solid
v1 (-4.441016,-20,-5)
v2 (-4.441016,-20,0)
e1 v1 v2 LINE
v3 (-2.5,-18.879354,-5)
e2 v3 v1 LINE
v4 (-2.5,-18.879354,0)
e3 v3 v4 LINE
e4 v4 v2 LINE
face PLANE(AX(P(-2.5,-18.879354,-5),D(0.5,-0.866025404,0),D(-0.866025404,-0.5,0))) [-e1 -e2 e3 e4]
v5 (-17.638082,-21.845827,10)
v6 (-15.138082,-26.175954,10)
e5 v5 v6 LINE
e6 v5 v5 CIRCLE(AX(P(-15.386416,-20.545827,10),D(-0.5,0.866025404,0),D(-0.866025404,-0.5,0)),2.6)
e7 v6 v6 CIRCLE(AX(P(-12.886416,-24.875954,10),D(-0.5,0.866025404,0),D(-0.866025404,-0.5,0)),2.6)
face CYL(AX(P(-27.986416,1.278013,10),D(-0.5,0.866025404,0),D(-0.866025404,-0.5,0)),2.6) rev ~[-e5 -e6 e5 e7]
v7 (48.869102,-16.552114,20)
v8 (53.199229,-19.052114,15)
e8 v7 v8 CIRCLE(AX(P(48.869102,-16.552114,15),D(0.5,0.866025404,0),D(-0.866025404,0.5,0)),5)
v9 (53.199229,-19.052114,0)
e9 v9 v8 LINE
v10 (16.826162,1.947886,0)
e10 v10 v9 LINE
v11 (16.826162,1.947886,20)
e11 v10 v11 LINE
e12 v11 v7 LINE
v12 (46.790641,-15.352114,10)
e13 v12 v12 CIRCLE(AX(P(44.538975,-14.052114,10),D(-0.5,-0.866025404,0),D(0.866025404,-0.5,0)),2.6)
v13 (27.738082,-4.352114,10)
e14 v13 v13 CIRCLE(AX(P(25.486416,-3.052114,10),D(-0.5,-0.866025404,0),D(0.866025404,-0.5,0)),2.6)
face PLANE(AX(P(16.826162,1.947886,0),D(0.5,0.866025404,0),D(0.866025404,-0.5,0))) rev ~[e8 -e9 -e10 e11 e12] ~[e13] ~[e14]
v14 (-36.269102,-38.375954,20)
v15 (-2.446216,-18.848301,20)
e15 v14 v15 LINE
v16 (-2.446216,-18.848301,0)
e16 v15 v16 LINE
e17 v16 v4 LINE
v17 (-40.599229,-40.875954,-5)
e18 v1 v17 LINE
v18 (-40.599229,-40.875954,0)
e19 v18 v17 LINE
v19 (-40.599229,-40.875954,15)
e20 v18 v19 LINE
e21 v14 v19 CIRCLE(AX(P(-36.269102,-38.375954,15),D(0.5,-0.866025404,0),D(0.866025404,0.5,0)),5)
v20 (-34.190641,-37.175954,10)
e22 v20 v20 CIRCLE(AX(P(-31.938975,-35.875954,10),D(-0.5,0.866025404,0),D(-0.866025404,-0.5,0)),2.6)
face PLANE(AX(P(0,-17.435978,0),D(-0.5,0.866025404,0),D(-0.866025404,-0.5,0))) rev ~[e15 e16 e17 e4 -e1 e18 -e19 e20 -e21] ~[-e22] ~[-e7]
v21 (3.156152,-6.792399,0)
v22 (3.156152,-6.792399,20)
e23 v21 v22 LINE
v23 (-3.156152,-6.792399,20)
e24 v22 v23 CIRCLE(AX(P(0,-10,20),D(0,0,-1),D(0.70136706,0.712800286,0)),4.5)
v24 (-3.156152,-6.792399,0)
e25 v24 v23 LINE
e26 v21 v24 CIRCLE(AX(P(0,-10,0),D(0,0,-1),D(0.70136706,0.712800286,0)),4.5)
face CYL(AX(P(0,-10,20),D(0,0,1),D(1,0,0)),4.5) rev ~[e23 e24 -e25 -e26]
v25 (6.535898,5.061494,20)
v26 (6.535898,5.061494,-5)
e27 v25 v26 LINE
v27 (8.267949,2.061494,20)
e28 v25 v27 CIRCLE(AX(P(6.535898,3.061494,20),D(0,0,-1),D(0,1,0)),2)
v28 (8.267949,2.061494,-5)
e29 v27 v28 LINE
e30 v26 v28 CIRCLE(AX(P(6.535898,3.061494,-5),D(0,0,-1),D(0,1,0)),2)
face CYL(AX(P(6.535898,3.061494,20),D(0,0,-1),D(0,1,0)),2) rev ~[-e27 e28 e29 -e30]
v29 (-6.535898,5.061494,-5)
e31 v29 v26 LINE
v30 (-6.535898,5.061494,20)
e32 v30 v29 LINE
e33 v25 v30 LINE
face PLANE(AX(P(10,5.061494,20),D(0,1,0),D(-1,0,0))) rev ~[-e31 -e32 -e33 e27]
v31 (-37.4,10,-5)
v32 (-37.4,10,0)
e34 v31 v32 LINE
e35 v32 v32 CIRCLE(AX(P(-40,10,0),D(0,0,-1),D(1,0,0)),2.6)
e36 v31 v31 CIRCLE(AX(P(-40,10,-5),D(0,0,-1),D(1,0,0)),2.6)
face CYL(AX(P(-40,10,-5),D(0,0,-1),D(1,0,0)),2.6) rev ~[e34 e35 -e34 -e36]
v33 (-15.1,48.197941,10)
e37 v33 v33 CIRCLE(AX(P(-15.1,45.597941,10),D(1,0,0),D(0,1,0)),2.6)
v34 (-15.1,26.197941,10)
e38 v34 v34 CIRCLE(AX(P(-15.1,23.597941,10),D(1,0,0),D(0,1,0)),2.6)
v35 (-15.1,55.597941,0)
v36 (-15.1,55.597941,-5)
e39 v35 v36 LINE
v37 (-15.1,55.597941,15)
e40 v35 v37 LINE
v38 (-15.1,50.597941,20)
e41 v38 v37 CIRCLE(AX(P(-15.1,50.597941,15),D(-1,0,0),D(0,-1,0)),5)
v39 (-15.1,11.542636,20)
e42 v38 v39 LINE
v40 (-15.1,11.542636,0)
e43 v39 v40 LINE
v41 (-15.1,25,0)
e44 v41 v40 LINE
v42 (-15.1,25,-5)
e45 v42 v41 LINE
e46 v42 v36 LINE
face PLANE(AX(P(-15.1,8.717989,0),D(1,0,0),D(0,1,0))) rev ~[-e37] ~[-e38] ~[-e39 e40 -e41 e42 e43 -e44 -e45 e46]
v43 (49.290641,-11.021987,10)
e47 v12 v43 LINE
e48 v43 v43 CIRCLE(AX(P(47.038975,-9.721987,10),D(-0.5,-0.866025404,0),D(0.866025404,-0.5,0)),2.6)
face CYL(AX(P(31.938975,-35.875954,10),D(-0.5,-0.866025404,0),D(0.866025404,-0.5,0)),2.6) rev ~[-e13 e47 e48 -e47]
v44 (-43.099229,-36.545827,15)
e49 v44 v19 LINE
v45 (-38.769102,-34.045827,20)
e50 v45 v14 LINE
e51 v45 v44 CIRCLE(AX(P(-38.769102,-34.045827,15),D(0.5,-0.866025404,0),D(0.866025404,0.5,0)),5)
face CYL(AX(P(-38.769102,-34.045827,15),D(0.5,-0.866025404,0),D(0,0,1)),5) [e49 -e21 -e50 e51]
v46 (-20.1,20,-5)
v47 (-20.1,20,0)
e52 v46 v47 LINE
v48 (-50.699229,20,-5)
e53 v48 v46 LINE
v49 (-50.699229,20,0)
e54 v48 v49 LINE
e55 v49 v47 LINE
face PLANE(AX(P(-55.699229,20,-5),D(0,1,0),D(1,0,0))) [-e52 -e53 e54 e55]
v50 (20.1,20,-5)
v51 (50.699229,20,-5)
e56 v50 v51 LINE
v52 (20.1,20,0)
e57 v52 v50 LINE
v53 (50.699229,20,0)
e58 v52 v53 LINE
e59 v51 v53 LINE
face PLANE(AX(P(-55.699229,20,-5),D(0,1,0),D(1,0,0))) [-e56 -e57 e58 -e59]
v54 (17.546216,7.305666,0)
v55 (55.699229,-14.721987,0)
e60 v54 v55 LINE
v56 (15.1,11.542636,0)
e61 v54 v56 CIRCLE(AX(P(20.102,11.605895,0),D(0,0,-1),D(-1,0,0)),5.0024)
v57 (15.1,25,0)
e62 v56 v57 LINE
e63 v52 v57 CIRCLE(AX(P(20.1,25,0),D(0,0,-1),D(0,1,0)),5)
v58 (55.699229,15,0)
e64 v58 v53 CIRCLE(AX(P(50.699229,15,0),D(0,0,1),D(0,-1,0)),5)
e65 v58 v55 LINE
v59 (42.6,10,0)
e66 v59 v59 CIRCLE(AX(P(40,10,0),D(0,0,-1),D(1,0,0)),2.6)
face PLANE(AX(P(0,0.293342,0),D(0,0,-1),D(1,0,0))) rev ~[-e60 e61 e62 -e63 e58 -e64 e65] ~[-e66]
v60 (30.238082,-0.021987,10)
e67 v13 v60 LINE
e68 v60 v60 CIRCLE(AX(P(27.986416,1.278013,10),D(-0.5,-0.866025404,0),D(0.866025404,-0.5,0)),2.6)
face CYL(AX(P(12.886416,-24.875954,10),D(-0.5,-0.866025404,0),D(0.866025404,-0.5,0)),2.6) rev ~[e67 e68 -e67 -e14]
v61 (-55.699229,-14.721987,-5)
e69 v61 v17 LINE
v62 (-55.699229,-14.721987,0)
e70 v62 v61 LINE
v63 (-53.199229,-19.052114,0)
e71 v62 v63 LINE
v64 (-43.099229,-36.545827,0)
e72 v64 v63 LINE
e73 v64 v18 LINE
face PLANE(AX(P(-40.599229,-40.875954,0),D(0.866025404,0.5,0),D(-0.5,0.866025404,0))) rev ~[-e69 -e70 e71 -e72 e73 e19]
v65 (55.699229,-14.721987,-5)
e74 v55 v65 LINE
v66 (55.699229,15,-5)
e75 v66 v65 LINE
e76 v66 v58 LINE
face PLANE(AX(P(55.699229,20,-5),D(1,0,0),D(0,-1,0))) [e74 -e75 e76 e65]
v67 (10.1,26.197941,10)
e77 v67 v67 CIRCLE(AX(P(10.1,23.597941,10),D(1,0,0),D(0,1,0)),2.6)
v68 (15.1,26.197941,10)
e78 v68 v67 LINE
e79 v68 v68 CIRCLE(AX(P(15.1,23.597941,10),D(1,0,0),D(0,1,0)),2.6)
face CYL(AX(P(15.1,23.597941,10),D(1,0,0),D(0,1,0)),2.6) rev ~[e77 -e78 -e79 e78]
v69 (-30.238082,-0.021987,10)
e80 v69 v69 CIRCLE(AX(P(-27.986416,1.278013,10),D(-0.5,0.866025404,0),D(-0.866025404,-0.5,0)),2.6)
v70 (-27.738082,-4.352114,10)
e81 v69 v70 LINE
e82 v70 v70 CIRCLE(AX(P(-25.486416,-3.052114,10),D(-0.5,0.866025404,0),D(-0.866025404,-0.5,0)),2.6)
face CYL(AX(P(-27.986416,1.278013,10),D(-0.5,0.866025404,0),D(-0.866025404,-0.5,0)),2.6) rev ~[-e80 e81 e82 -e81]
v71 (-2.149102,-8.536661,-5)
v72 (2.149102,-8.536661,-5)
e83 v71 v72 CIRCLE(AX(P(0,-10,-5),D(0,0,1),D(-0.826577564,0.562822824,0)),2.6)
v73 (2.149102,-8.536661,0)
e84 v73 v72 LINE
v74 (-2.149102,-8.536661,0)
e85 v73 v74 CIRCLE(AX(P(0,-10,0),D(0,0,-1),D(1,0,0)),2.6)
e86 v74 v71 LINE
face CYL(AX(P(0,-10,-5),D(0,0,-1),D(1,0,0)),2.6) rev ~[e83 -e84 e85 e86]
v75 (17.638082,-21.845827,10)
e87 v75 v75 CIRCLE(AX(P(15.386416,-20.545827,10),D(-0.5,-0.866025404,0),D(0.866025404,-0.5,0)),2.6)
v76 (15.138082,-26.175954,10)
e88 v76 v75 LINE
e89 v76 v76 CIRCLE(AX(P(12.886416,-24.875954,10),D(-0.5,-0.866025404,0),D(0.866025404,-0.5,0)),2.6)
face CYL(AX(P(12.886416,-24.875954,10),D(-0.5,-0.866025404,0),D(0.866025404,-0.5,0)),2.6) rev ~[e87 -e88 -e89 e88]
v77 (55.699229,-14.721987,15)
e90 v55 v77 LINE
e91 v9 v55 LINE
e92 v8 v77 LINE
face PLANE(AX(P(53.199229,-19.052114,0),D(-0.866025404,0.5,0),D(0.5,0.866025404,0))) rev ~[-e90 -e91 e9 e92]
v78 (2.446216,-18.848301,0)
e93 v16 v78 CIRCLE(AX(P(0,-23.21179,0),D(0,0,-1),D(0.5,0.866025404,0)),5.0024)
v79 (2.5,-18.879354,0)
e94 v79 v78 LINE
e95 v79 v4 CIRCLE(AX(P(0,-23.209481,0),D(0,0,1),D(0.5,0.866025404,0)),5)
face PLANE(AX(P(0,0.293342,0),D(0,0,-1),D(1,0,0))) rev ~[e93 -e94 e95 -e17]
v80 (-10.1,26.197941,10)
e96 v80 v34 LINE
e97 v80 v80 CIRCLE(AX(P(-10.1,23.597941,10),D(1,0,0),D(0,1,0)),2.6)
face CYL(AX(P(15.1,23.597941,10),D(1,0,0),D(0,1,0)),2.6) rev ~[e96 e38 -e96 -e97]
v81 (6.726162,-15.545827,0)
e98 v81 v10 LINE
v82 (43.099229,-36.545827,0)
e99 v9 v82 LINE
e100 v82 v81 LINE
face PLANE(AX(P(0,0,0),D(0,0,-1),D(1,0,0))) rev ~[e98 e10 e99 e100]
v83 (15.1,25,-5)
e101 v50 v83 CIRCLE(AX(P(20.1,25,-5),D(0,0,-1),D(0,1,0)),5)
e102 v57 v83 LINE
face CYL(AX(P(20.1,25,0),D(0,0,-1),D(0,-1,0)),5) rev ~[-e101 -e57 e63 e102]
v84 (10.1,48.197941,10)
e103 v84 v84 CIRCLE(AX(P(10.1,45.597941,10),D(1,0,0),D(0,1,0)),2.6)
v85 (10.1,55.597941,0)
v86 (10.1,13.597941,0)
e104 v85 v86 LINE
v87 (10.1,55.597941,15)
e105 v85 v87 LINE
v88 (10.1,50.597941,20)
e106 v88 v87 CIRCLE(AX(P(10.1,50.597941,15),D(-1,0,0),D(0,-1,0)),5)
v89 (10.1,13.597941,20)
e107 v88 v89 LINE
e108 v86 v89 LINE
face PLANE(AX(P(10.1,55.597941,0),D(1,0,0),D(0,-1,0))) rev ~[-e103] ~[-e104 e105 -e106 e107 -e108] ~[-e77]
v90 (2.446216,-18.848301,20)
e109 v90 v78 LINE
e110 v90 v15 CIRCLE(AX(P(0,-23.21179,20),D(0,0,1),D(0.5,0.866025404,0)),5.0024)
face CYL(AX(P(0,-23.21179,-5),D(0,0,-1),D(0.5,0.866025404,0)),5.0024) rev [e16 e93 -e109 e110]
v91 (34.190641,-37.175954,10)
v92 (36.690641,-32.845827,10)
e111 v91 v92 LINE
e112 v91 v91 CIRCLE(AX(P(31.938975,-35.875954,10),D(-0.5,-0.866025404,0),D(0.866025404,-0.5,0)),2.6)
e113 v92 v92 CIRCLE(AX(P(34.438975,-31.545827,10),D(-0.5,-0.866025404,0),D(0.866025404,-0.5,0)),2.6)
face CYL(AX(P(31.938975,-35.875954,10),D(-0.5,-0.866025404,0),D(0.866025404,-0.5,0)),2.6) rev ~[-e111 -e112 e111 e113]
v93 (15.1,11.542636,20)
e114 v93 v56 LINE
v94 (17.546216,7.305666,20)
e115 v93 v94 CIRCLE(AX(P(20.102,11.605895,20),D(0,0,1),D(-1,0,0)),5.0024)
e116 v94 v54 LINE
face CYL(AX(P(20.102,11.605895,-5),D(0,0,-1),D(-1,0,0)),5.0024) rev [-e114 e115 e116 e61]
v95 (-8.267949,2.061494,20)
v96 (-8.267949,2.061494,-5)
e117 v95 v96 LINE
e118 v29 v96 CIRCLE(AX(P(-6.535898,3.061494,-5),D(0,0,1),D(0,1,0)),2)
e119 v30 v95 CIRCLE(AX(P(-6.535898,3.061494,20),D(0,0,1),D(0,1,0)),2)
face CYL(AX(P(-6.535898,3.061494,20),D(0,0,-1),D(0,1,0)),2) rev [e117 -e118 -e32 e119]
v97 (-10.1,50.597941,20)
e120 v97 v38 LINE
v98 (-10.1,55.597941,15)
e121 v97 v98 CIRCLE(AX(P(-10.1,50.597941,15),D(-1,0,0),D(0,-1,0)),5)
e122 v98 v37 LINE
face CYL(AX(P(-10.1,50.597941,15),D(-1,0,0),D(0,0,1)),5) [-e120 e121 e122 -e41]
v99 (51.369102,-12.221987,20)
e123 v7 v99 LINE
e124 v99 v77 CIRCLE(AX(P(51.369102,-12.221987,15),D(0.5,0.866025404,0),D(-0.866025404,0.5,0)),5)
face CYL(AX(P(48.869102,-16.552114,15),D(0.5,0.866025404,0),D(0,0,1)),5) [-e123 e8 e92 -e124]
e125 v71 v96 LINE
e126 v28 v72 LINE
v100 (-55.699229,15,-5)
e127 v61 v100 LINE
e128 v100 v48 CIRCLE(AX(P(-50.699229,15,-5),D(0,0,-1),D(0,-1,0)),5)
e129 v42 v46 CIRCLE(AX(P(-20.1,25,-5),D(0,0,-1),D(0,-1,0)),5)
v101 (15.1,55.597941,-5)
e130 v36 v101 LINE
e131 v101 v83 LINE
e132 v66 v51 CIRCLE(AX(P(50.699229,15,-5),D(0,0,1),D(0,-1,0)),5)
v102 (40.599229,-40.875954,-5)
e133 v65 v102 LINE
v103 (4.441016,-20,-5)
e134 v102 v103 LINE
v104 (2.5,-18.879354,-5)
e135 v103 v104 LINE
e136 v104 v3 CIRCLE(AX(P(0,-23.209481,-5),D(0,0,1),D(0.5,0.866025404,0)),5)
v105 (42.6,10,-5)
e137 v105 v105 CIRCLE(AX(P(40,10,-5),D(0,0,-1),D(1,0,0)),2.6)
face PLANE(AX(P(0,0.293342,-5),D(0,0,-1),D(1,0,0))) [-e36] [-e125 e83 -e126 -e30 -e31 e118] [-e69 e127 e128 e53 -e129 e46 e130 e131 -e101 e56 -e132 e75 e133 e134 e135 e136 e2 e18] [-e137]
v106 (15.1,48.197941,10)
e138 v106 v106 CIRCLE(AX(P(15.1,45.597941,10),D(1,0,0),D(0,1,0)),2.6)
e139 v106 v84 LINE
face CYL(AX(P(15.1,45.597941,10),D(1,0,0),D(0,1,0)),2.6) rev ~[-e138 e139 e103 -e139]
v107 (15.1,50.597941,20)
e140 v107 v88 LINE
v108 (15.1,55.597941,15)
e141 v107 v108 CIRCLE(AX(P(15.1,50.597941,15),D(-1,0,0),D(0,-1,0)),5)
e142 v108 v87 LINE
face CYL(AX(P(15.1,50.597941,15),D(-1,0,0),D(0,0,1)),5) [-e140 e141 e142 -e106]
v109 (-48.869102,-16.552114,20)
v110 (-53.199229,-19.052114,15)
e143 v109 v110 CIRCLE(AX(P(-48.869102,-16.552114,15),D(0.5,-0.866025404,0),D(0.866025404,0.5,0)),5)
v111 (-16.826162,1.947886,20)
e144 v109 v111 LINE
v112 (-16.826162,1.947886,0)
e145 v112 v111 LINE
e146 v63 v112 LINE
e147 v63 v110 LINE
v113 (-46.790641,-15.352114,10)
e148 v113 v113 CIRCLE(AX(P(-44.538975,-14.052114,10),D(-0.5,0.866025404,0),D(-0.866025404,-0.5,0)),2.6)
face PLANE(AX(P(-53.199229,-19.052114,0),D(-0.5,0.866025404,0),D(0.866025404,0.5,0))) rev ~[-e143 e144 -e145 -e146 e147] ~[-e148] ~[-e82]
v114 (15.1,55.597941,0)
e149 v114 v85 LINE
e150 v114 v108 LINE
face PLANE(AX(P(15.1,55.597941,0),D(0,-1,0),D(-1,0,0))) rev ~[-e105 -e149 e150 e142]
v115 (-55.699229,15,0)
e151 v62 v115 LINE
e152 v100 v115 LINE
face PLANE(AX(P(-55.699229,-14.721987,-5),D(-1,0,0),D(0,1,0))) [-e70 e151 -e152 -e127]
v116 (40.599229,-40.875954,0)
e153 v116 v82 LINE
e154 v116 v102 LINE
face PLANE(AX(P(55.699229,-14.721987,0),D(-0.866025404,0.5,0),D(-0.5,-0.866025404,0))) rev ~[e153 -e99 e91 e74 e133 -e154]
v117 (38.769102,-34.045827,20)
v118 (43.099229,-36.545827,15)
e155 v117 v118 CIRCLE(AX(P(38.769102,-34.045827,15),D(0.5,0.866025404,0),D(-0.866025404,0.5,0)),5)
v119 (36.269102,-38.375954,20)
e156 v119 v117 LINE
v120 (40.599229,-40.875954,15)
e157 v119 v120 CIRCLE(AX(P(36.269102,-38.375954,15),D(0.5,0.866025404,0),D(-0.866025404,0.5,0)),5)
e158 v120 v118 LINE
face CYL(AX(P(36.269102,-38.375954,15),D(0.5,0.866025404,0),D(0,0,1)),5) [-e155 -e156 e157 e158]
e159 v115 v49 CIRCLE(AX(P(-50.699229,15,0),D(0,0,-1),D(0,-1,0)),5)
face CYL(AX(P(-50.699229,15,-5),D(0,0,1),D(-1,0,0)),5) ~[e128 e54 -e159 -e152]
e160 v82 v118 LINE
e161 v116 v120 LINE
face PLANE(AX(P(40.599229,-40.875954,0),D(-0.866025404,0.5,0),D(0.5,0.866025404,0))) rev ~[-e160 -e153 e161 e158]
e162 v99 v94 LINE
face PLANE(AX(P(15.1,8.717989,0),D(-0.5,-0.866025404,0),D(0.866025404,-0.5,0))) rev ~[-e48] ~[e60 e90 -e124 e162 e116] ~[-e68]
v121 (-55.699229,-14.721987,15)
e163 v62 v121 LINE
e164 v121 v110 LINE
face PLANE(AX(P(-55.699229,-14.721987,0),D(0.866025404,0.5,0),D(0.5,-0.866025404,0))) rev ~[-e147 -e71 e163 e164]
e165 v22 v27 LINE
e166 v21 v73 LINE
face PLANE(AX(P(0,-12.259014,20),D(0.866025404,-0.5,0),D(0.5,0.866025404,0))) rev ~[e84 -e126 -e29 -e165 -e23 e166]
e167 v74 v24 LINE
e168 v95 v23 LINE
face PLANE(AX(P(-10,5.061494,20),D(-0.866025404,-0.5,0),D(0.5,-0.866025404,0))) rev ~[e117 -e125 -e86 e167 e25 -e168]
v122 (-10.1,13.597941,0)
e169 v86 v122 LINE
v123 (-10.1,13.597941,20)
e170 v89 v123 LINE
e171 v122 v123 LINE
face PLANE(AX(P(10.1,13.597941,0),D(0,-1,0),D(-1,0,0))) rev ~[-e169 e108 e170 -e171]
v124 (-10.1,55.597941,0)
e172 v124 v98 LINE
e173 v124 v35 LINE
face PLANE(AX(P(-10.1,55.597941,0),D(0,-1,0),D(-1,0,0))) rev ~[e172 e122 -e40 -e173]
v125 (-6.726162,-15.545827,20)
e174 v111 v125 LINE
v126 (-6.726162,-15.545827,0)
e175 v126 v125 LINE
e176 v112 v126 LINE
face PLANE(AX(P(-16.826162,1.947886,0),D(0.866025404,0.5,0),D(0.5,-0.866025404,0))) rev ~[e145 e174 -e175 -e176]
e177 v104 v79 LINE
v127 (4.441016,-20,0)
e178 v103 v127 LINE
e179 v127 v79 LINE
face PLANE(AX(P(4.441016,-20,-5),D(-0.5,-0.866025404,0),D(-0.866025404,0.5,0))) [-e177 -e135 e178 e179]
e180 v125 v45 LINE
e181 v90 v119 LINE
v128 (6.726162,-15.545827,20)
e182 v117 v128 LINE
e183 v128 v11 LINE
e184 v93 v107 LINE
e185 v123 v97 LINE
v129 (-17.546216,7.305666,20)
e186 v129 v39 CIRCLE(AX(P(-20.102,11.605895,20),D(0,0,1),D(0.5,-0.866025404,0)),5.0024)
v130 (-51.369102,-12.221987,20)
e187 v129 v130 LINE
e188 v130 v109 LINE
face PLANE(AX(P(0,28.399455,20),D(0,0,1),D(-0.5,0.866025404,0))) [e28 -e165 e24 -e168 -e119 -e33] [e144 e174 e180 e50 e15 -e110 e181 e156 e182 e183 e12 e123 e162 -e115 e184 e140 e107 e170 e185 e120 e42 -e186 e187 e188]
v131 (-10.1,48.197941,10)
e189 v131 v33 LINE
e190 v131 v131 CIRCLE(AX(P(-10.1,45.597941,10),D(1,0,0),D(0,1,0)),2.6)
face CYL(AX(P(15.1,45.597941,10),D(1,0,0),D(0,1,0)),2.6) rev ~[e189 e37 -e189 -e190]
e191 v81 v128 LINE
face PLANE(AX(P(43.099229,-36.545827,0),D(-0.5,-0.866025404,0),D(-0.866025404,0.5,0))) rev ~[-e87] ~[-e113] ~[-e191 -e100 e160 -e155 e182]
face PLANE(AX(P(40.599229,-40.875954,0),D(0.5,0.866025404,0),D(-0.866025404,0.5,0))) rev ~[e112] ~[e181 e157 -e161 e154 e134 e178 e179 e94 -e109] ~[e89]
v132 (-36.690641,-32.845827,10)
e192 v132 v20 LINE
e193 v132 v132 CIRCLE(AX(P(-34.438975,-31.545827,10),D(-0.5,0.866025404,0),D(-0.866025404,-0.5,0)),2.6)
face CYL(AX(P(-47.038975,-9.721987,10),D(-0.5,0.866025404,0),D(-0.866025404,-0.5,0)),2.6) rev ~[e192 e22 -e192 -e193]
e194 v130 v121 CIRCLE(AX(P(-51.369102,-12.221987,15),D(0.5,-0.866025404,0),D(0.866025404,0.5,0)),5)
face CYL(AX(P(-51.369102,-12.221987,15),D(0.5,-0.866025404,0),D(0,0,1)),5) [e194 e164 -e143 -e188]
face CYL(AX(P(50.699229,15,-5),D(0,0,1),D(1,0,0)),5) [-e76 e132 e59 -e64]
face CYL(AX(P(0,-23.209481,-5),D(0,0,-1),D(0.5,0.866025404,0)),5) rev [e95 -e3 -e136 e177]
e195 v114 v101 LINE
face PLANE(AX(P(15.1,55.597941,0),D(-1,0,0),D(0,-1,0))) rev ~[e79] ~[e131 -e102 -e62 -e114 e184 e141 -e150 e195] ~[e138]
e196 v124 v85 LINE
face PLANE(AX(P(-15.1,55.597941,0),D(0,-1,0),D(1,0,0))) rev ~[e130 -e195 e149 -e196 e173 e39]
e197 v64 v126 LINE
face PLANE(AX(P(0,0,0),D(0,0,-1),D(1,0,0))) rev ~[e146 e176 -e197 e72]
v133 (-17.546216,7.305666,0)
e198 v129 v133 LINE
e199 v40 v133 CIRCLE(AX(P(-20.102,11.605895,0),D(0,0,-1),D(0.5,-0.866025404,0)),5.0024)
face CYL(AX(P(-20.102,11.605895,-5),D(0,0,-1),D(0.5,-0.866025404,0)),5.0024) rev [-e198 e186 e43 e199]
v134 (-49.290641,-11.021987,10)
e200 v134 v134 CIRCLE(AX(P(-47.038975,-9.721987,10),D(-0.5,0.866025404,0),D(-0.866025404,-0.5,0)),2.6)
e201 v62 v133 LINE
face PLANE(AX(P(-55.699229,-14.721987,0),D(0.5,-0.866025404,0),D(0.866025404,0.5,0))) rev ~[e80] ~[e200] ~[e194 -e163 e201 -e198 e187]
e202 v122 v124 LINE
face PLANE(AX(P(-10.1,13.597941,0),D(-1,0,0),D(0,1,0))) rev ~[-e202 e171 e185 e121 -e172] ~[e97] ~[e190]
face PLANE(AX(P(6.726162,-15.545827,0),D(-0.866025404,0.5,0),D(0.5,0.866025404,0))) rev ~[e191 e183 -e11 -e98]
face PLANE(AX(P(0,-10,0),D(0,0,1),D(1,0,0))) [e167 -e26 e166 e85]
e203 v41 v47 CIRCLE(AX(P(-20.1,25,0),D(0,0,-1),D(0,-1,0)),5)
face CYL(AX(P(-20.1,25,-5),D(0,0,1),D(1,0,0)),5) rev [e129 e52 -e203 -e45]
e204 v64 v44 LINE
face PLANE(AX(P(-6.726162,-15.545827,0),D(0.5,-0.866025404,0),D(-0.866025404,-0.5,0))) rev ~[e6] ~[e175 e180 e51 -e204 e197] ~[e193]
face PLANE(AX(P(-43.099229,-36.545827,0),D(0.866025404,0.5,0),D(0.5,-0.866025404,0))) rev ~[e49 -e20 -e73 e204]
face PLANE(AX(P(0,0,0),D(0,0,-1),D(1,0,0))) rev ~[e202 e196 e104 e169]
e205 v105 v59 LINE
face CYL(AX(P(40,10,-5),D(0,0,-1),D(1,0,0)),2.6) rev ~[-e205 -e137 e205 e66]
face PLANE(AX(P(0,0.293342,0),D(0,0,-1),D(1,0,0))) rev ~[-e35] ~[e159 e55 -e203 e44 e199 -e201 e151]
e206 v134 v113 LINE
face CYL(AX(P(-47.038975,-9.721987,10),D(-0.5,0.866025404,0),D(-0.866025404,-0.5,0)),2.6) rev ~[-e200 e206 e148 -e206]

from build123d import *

# Parameters (mm, degrees)
F1_DEPTH    = 20
F2_R        = 2.6
F3_DEPTH    = 50.6016350946
F4_COUNT    = 3
F4_ANGLE    = 240
F6_DEPTH    = 5
F7_T1_DEPTH = 25
F10_DEPTH   = 5
F11_DEPTH   = 25.001
F12_R       = 2
F13_R       = 2.6
F14_DEPTH   = 25.001
F15_R       = 5
F16_R       = 4.5
F17_DEPTH   = 20


# Not quite as in the source:
# - a fillet or chamfer that OpenCascade refuses, or shapes differently, is made with other operations: its cross-section is extruded or revolved along the edge and cut away or added


with BuildPart() as f1:
    # F0 (on Top) → F1 (new body)
    with BuildSketch(Plane.XY):
        Polygon((43.0992290895, -36.5458269543), (6.7261621305, -15.5458269543), (16.8261621305, 1.9478862021), (53.1992290895, -19.0521137979), (55.6992290895, -14.7219867789), (14.8979589003, 8.8346375481), (0, 0), (-0.2020410997, -17.3193296462), (40.5992290895, -40.8759539732), align=None)
    extrude(amount=F1_DEPTH)

    # F2 (on face) → F3 (cut, through all)
    with BuildSketch(Plane(origin=(-7.55, -13.0769835971, 0), x_dir=(0.8660254038, -0.5, 0), z_dir=(-0.5, -0.8660254038, 0))):
        with Locations((45.5979407522, 10)):
            Circle(F2_R)
        with Locations((23.5979407522, 10)):
            Circle(F2_R)
    extrude(amount=-F3_DEPTH, mode=Mode.SUBTRACT)

    # F4: F1 ×3 about axis
    f4_axis = Axis((0, 0, 10), (0, 0, -1))


with BuildPart() as f1_1:
    add(f1.part)
    for i in range(1, F4_COUNT):
        add(f1.part.rotate(f4_axis, i * F4_ANGLE / (F4_COUNT - 1)))

    # F5 (on face) → F6 (join)
    with BuildSketch(Plane(origin=(0, 0, 0), x_dir=(1, 0, 0), z_dir=(0, 0, -1))):
        Polygon((0, 17.4359781295), (-40.5992290895, 40.8759539732), (-55.6992290895, 14.7219867789), (-15.1, -8.7179890648), (-15.1, -55.5979407522), (15.1, -55.5979407522), (15.1, -8.7179890648), (55.6992290895, 14.7219867789), (40.5992290895, 40.8759539732), align=None)
    extrude(amount=F6_DEPTH)

    # F7: fillet of radius 5 on 3 edges, made by hand

    # F7_s2 → F7_t1 (join)
    with BuildSketch(Plane.XY.offset(-5)):
        with BuildLine():
            ThreePointArc((2.5012, -18.8795847426), (0, -18.2093902225), (-2.5012, -18.8795847426))
            Line((-2.5012, -18.8795847426), (-2.75132, -18.4463641946))
            ThreePointArc((-2.75132, -18.4463641946), (-1.50062, -17.7247340932), (-0.25012, -17.0027575815))
            Line((-0.25012, -17.0027575815), (0.25012, -17.0027575815))
            ThreePointArc((0.25012, -17.0027575815), (1.50062, -17.7247340932), (2.75132, -18.4463641946))
            Line((2.75132, -18.4463641946), (2.5012, -18.8795847426))
        make_face()
        with BuildLine():
            ThreePointArc((15.0996, 11.6058951112), (15.7697945201, 9.1046951112), (17.6008, 7.2736896314))
            Line((17.6008, 7.2736896314), (17.35068, 6.8404690834))
            ThreePointArc((17.35068, 6.8404690834), (16.10038, 7.5627920052), (14.84988, 8.2847685168))
            Line((14.84988, 8.2847685168), (14.59976, 8.7179890648))
            ThreePointArc((14.59976, 8.7179890648), (14.59976, 10.161942088), (14.59936, 11.6058951112))
            Line((14.59936, 11.6058951112), (15.0996, 11.6058951112))
        make_face()
        with BuildLine():
            ThreePointArc((-17.6008, 7.2736896314), (-15.7697945201, 9.1046951112), (-15.0996, 11.6058951112))
            Line((-15.0996, 11.6058951112), (-14.59936, 11.6058951112))
            ThreePointArc((-14.59936, 11.6058951112), (-14.59976, 10.161942088), (-14.59976, 8.7179890648))
            Line((-14.59976, 8.7179890648), (-14.84988, 8.2847685168))
            ThreePointArc((-14.84988, 8.2847685168), (-16.10038, 7.5627920052), (-17.35068, 6.8404690834))
            Line((-17.35068, 6.8404690834), (-17.6008, 7.2736896314))
        make_face()
    extrude(amount=F7_T1_DEPTH)

    # F9 (on face) → F10 (join)
    with BuildSketch(Plane(origin=(0, 0, -5), x_dir=(1, 0, 0), z_dir=(0, 0, -1))):
        with BuildLine():
            Line((-55.6992290895, 14.7219867789), (-55.6992290895, -20))
            Line((-55.6992290895, -20), (55.6992290895, -20))
            Line((55.6992290895, -20), (55.6992290895, 14.7219867789))
            Line((55.6992290895, 14.7219867789), (52.6519667355, 20))
            Line((52.6519667355, 20), (4.4410161514, 20))
            Line((4.4410161514, 20), (2.5, 18.8793538025))
            ThreePointArc((2.5, 18.8793538025), (0, 18.2094808214), (-2.5, 18.8793538025))
            Line((-2.5, 18.8793538025), (-4.4410161514, 20))
            Line((-4.4410161514, 20), (-52.6519667355, 20))
            Line((-52.6519667355, 20), (-55.6992290895, 14.7219867789))
        make_face()
    extrude(amount=-F10_DEPTH)

    # F8 (on face) → F11 (cut, through all)
    with BuildSketch(Plane.XY.offset(20)):
        Polygon((10, 5.0614941438), (-10, 5.0614941438), (0, -12.2590139319), align=None)
    extrude(amount=-F11_DEPTH, mode=Mode.SUBTRACT)

    # F12
    f12_edges = [f1_1.edges().sort_by_distance(p)[0] for p in [
        (10, 5.061494, 7.5),
        (-10, 5.061494, 7.5),
        (0, -12.259014, 7.5),
    ]]
    fillet(f12_edges, radius=F12_R)

    # F13 (on face) → F14 (cut, through all)
    with BuildSketch(Plane(origin=(0, 0, -5), x_dir=(1, 0, 0), z_dir=(0, 0, -1))):
        with Locations((-40, -10)):
            Circle(F13_R)
        with Locations((40, -10)):
            Circle(F13_R)
        with Locations((0, 10)):
            Circle(F13_R)
    extrude(amount=-F14_DEPTH, mode=Mode.SUBTRACT)

    # F15
    f15_edges = [f1_1.edges().sort_by_distance(p)[0] for p in [
        (-15.1, 20, -2.5),
        (15.1, 20, -2.5),
        (55.699229, 20, -2.5),
        (-55.699229, 20, -2.5),
        (-12.6, 55.597941, 20),
        (12.6, 55.597941, 20),
        (-54.449229, -16.88705, 20),
        (-41.849229, -38.71089, 20),
        (54.449229, -16.88705, 20),
        (41.849229, -38.71089, 20),
    ]]
    fillet(f15_edges, radius=F15_R)

    # F16 (on face) → F17 (cut)
    with BuildSketch(Plane.XY.offset(20)):
        with Locations((0, -10)):
            Circle(F16_R)
    extrude(amount=-F17_DEPTH, mode=Mode.SUBTRACT)


solid = f1_1.part
